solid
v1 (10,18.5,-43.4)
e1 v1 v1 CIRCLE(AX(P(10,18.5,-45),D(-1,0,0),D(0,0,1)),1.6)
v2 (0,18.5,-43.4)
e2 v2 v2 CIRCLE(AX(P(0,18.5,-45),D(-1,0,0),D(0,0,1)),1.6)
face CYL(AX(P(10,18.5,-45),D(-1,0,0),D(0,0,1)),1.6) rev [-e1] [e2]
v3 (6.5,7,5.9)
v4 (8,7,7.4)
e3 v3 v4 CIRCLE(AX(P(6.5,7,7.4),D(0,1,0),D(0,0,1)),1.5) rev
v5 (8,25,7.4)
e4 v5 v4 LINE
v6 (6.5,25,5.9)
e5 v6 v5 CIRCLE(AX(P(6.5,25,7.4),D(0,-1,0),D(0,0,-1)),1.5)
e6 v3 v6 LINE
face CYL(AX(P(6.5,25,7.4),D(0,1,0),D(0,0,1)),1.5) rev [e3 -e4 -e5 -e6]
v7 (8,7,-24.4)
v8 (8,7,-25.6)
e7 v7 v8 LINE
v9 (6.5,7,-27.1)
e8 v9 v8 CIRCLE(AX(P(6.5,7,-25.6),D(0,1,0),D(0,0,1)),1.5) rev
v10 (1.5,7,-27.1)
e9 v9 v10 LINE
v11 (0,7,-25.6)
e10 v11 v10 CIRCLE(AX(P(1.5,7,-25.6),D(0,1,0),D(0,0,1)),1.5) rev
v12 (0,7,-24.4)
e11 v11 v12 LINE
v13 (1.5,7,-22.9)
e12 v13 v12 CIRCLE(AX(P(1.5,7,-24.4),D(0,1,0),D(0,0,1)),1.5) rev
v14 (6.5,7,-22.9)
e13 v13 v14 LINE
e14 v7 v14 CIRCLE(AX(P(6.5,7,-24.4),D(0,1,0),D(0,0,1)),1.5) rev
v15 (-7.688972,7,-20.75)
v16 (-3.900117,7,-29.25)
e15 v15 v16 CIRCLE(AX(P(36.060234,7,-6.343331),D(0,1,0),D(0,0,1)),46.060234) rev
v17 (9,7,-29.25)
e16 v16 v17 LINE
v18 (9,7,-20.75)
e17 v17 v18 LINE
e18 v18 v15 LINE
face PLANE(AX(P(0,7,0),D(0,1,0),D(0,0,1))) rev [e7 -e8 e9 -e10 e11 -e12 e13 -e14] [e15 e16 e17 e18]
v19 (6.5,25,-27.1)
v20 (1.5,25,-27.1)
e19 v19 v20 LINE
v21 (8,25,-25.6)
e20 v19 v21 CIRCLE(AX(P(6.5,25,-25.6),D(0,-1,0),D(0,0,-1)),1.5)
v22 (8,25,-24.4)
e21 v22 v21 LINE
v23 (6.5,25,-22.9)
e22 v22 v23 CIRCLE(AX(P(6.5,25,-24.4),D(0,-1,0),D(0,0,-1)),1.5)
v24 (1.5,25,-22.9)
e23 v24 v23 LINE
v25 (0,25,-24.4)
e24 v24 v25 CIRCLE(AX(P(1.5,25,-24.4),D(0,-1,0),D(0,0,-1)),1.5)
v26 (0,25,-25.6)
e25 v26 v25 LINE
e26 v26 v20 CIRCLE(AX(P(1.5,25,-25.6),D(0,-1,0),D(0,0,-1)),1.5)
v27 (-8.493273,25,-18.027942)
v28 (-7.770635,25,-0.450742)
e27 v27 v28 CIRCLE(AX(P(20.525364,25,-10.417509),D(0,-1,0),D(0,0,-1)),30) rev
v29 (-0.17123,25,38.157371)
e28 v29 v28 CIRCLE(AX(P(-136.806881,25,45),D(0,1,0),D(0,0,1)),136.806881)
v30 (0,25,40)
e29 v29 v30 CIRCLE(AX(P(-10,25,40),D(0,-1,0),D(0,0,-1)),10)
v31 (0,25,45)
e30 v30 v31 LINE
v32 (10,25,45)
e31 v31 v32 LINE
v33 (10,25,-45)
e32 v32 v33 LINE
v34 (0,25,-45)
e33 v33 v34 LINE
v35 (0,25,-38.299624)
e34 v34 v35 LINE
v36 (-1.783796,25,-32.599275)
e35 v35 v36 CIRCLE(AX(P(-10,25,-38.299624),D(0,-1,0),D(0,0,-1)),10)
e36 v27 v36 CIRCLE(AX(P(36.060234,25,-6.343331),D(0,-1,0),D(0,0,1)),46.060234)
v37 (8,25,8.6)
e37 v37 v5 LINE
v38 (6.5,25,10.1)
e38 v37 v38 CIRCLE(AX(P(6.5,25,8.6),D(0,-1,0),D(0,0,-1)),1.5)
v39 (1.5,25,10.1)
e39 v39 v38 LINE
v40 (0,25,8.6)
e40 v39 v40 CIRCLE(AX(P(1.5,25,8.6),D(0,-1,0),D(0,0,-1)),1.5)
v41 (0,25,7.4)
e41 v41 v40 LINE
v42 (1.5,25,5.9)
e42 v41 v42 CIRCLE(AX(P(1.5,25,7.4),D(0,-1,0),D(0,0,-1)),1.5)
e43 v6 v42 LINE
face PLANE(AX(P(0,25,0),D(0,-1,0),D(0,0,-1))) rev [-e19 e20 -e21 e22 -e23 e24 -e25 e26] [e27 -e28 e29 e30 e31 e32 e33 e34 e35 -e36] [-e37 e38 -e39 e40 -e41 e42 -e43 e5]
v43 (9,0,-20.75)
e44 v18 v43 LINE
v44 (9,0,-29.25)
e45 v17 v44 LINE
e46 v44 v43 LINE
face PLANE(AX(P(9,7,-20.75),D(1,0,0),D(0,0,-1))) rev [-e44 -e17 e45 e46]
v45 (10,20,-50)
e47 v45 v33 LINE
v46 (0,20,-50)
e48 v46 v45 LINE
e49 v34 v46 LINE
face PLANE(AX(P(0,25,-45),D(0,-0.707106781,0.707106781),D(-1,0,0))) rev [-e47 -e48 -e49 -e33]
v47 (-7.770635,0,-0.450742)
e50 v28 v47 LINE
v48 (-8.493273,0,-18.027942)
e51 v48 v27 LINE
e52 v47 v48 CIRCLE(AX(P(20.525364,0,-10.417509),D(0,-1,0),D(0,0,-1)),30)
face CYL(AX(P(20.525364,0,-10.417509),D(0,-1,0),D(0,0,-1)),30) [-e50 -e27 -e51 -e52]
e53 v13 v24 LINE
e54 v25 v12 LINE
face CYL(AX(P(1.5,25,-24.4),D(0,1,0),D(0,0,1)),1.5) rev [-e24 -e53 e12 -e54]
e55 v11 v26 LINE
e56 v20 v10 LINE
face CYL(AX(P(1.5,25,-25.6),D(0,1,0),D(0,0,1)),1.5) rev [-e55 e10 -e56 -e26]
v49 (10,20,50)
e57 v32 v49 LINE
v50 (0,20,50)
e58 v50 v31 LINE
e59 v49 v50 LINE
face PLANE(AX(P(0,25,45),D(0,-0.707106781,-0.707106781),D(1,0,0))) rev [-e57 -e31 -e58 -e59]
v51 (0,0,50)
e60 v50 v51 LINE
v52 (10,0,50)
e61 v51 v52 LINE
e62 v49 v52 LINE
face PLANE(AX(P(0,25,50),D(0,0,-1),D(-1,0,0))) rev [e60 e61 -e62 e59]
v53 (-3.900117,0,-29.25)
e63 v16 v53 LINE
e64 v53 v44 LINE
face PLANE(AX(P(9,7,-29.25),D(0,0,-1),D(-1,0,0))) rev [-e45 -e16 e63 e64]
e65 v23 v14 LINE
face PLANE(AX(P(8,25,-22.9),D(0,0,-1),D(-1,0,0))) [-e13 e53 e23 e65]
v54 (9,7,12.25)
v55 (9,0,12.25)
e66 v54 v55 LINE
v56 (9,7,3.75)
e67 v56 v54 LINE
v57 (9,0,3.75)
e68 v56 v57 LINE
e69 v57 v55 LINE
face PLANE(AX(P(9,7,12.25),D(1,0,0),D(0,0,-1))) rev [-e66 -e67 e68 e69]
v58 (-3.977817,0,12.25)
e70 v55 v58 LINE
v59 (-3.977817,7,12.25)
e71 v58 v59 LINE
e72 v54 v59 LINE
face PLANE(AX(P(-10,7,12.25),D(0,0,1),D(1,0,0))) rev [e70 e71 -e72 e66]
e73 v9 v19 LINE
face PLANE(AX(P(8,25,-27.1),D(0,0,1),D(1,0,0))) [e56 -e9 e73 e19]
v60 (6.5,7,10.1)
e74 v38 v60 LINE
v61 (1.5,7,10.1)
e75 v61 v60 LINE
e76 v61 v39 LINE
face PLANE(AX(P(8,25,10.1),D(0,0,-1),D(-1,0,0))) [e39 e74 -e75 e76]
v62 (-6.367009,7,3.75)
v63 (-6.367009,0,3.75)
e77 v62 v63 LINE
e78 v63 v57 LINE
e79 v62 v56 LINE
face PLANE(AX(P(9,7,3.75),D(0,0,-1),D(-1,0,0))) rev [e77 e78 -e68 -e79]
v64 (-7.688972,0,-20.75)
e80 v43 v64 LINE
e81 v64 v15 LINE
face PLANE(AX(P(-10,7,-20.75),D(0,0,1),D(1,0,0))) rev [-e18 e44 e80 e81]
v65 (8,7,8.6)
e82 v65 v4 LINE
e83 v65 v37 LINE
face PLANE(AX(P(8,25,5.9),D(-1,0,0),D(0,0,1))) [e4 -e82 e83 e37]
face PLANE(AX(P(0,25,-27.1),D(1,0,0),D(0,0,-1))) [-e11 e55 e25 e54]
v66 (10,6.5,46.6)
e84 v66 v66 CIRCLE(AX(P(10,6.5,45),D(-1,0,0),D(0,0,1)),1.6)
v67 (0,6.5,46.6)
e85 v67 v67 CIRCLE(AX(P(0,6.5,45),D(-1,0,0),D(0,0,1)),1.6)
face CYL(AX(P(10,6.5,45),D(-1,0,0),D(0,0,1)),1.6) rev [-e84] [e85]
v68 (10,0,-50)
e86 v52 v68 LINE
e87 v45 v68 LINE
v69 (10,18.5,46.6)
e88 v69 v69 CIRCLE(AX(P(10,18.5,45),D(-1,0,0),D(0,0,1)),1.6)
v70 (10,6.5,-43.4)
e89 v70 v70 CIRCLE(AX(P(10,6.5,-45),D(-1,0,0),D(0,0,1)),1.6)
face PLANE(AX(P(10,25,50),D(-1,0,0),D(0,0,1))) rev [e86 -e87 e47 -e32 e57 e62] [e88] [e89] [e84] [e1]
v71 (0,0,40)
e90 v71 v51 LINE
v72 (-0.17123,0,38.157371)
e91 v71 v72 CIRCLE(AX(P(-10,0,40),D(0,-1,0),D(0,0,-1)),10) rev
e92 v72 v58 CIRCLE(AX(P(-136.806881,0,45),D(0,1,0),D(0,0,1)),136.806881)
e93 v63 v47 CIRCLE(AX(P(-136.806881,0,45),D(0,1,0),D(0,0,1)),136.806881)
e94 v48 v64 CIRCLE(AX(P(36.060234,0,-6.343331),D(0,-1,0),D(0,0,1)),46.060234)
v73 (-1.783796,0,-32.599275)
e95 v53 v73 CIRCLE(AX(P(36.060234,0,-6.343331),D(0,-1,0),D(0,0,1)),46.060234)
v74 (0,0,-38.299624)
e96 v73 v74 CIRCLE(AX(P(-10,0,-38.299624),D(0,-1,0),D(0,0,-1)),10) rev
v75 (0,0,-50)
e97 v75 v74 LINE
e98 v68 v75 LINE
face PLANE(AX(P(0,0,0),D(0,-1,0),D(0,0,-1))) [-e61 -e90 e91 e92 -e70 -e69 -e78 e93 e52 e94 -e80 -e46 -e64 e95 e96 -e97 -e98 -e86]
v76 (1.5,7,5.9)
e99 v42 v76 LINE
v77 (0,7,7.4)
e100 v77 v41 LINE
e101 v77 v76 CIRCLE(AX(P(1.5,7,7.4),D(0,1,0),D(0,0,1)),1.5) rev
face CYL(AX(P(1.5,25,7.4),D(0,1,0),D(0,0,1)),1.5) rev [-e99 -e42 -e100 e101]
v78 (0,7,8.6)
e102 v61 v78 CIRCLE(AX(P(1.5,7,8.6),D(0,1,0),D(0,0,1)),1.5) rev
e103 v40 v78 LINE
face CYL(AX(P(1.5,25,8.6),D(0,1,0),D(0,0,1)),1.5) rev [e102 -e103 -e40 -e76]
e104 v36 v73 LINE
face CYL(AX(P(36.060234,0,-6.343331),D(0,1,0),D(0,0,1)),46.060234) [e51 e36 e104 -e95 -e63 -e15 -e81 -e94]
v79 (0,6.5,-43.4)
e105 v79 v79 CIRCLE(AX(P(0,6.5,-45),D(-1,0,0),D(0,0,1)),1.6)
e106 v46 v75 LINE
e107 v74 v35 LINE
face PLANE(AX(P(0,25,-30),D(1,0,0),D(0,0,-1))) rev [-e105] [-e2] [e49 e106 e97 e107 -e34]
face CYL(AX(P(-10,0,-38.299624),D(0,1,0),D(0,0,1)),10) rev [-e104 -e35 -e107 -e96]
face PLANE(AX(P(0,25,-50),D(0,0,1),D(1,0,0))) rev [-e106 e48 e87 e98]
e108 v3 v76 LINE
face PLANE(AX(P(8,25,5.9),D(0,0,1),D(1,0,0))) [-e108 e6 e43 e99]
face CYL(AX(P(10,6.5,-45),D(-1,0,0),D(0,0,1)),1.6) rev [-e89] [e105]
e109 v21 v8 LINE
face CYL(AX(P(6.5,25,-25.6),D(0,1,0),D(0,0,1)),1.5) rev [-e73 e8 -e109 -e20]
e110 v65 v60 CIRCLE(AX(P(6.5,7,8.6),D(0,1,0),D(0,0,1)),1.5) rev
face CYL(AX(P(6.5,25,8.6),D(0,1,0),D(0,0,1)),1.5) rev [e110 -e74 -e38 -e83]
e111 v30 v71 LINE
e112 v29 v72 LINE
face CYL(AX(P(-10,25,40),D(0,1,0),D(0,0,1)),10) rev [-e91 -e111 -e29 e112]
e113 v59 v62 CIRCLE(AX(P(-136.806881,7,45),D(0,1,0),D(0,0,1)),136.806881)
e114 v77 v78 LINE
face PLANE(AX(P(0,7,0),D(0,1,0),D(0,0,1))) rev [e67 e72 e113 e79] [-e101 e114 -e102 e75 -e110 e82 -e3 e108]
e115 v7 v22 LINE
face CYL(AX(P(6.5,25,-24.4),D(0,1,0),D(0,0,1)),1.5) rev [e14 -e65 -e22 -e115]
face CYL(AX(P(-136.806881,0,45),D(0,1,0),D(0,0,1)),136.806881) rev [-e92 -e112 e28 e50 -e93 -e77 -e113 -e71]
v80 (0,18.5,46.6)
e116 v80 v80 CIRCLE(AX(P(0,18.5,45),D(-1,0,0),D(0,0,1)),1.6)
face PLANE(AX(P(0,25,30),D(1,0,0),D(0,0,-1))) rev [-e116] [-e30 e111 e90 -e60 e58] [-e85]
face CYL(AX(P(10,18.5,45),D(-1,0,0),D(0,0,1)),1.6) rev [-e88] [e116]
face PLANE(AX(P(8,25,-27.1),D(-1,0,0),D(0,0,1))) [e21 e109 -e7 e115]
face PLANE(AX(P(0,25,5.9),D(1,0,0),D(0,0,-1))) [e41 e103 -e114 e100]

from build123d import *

# Parameters (mm, degrees)
SKETCH_1_W          = 8
SKETCH_1_H          = 4.2
EXTRUDE_1_DEPTH     = 25
SKETCH_2_R          = 1.6
CUT_EXTRUDE_1_DEPTH = 57.789083458
SKETCH_3_R          = 1.6
CUT_EXTRUDE_2_DEPTH = 57.789083458
FILLET_7_R          = 1.5
CHAMFER_1_SIZE      = 5
FILLET_8_R          = 10
SKETCH1_W           = 19
SKETCH1_H           = 8.5
CUT_EXTRUDE1_DEPTH  = 7
CHAMFER1_START      = -19
CHAMFER1_OUTLINE_W  = 27
CHAMFER1_OUTLINE_H  = 17
CHAMFER1_DEPTH      = 4.338795771
CUT_EXTRUDE3_DEPTH  = 57.789083458
FILLET7_R           = 30
FILLET8_R           = 10


with BuildPart() as part:
    # Эскиз1 → Бобышка-Вытянуть1 (new body)
    with BuildSketch(Plane(origin=(0, 0, 0), x_dir=(1, 0, 0), z_dir=(0, 1, 0))):
        Polygon((-10, -30), (0, -30), (0, -50), (10, -50), (10, 50), (0, 50), (0, 30), (-10, 30), align=None)
        with Locations((4, 25)):
            Rectangle(SKETCH_1_W, SKETCH_1_H, mode=Mode.SUBTRACT)
        with Locations((4, -8)):
            Rectangle(SKETCH_1_W, SKETCH_1_H, mode=Mode.SUBTRACT)
    extrude(amount=EXTRUDE_1_DEPTH)

    # Эскиз2 → Вырез-Вытянуть1 (cut, through all)
    with BuildSketch(Plane.ZY):
        with Locations((-45, 6.5)):
            Circle(SKETCH_2_R)
        with Locations((-45, 18.5)):
            Circle(SKETCH_2_R)
    extrude(amount=-CUT_EXTRUDE_1_DEPTH, mode=Mode.SUBTRACT)

    # Эскиз3 → Вырез-Вытянуть2 (cut, through all)
    with BuildSketch(Plane.ZY):
        with Locations((45, 6.5)):
            Circle(SKETCH_3_R)
        with Locations((45, 18.5)):
            Circle(SKETCH_3_R)
    extrude(amount=-CUT_EXTRUDE_2_DEPTH, mode=Mode.SUBTRACT)

    # Скругление7
    fillet_7_edges = [part.edges().sort_by_distance(p)[0] for p in [
        (0, 12.5, 5.9),
        (0, 12.5, 10.1),
        (8, 12.5, 10.1),
        (8, 12.5, 5.9),
        (0, 12.5, -22.9),
        (8, 12.5, -22.9),
        (8, 12.5, -27.1),
        (0, 12.5, -27.1),
    ]]
    fillet(fillet_7_edges, radius=FILLET_7_R)

    # Фаска1
    chamfer_1_edges = [part.edges().sort_by_distance(p)[0] for p in [
        (5, 25, 50),
        (5, 25, -50),
    ]]
    chamfer(chamfer_1_edges, length=CHAMFER_1_SIZE)

    # Скругление8
    fillet_8_edges = [part.edges().sort_by_distance(p)[0] for p in [
        (0, 12.5, 30),
        (0, 12.5, -30),
    ]]
    fillet(fillet_8_edges, radius=FILLET_8_R - 0.0001)  # a hair under: the kernel refuses the full size

    # Sketch1 → Cut-Extrude1 (cut)
    with BuildSketch(Plane.XZ):
        with Locations((-0.5, 8)):
            Rectangle(SKETCH1_W, SKETCH1_H)
        with Locations((-0.5, -25)):
            Rectangle(SKETCH1_W, SKETCH1_H)
    extrude(amount=-CUT_EXTRUDE1_DEPTH, mode=Mode.SUBTRACT)

    # Chamfer1: read off the stored shape, not the designer's step
    # Chamfer1 outline → Chamfer1 (cut)
    with BuildSketch(Plane(origin=(0, 0, 0), x_dir=(0, 1, 0), z_dir=(0.9555233585367056, 0, -0.29491543074368715)).offset(CHAMFER1_START)):
        with Locations((12.5, 20.5)):
            Rectangle(CHAMFER1_OUTLINE_W, CHAMFER1_OUTLINE_H)
    extrude(amount=CHAMFER1_DEPTH, mode=Mode.SUBTRACT)

    # Sketch3 → Cut-Extrude3 (cut, through all)
    with BuildSketch(Plane(origin=(0, 25, 0), x_dir=(1, 0, 0), z_dir=(0, 1, 0))):
        with BuildLine():
            Line((0, 35), (0, 45))
            Line((0, 45), (-16.541380551, 45))
            Line((-16.541380551, 45), (-16.541380551, -45))
            Line((-16.541380551, -45), (0, -45))
            ThreePointArc((0, -45), (-2.523269625, -18.845948598), (-10, 6.343330813))
            ThreePointArc((-10, 6.343330813), (-7.428201086, 21.519007807), (0, 35))
        make_face()
    extrude(amount=-CUT_EXTRUDE3_DEPTH, mode=Mode.SUBTRACT)

    # Fillet7
    fillet7_edges = [part.edges().sort_by_distance(p)[0] for p in [
        (-10, 12.5, -6.343330813),
    ]]
    fillet(fillet7_edges, radius=FILLET7_R)

    # Fillet8
    fillet8_edges = [part.edges().sort_by_distance(p)[0] for p in [
        (0, 12.5, -35),
    ]]
    fillet(fillet8_edges, radius=FILLET8_R)


solid = part.part
